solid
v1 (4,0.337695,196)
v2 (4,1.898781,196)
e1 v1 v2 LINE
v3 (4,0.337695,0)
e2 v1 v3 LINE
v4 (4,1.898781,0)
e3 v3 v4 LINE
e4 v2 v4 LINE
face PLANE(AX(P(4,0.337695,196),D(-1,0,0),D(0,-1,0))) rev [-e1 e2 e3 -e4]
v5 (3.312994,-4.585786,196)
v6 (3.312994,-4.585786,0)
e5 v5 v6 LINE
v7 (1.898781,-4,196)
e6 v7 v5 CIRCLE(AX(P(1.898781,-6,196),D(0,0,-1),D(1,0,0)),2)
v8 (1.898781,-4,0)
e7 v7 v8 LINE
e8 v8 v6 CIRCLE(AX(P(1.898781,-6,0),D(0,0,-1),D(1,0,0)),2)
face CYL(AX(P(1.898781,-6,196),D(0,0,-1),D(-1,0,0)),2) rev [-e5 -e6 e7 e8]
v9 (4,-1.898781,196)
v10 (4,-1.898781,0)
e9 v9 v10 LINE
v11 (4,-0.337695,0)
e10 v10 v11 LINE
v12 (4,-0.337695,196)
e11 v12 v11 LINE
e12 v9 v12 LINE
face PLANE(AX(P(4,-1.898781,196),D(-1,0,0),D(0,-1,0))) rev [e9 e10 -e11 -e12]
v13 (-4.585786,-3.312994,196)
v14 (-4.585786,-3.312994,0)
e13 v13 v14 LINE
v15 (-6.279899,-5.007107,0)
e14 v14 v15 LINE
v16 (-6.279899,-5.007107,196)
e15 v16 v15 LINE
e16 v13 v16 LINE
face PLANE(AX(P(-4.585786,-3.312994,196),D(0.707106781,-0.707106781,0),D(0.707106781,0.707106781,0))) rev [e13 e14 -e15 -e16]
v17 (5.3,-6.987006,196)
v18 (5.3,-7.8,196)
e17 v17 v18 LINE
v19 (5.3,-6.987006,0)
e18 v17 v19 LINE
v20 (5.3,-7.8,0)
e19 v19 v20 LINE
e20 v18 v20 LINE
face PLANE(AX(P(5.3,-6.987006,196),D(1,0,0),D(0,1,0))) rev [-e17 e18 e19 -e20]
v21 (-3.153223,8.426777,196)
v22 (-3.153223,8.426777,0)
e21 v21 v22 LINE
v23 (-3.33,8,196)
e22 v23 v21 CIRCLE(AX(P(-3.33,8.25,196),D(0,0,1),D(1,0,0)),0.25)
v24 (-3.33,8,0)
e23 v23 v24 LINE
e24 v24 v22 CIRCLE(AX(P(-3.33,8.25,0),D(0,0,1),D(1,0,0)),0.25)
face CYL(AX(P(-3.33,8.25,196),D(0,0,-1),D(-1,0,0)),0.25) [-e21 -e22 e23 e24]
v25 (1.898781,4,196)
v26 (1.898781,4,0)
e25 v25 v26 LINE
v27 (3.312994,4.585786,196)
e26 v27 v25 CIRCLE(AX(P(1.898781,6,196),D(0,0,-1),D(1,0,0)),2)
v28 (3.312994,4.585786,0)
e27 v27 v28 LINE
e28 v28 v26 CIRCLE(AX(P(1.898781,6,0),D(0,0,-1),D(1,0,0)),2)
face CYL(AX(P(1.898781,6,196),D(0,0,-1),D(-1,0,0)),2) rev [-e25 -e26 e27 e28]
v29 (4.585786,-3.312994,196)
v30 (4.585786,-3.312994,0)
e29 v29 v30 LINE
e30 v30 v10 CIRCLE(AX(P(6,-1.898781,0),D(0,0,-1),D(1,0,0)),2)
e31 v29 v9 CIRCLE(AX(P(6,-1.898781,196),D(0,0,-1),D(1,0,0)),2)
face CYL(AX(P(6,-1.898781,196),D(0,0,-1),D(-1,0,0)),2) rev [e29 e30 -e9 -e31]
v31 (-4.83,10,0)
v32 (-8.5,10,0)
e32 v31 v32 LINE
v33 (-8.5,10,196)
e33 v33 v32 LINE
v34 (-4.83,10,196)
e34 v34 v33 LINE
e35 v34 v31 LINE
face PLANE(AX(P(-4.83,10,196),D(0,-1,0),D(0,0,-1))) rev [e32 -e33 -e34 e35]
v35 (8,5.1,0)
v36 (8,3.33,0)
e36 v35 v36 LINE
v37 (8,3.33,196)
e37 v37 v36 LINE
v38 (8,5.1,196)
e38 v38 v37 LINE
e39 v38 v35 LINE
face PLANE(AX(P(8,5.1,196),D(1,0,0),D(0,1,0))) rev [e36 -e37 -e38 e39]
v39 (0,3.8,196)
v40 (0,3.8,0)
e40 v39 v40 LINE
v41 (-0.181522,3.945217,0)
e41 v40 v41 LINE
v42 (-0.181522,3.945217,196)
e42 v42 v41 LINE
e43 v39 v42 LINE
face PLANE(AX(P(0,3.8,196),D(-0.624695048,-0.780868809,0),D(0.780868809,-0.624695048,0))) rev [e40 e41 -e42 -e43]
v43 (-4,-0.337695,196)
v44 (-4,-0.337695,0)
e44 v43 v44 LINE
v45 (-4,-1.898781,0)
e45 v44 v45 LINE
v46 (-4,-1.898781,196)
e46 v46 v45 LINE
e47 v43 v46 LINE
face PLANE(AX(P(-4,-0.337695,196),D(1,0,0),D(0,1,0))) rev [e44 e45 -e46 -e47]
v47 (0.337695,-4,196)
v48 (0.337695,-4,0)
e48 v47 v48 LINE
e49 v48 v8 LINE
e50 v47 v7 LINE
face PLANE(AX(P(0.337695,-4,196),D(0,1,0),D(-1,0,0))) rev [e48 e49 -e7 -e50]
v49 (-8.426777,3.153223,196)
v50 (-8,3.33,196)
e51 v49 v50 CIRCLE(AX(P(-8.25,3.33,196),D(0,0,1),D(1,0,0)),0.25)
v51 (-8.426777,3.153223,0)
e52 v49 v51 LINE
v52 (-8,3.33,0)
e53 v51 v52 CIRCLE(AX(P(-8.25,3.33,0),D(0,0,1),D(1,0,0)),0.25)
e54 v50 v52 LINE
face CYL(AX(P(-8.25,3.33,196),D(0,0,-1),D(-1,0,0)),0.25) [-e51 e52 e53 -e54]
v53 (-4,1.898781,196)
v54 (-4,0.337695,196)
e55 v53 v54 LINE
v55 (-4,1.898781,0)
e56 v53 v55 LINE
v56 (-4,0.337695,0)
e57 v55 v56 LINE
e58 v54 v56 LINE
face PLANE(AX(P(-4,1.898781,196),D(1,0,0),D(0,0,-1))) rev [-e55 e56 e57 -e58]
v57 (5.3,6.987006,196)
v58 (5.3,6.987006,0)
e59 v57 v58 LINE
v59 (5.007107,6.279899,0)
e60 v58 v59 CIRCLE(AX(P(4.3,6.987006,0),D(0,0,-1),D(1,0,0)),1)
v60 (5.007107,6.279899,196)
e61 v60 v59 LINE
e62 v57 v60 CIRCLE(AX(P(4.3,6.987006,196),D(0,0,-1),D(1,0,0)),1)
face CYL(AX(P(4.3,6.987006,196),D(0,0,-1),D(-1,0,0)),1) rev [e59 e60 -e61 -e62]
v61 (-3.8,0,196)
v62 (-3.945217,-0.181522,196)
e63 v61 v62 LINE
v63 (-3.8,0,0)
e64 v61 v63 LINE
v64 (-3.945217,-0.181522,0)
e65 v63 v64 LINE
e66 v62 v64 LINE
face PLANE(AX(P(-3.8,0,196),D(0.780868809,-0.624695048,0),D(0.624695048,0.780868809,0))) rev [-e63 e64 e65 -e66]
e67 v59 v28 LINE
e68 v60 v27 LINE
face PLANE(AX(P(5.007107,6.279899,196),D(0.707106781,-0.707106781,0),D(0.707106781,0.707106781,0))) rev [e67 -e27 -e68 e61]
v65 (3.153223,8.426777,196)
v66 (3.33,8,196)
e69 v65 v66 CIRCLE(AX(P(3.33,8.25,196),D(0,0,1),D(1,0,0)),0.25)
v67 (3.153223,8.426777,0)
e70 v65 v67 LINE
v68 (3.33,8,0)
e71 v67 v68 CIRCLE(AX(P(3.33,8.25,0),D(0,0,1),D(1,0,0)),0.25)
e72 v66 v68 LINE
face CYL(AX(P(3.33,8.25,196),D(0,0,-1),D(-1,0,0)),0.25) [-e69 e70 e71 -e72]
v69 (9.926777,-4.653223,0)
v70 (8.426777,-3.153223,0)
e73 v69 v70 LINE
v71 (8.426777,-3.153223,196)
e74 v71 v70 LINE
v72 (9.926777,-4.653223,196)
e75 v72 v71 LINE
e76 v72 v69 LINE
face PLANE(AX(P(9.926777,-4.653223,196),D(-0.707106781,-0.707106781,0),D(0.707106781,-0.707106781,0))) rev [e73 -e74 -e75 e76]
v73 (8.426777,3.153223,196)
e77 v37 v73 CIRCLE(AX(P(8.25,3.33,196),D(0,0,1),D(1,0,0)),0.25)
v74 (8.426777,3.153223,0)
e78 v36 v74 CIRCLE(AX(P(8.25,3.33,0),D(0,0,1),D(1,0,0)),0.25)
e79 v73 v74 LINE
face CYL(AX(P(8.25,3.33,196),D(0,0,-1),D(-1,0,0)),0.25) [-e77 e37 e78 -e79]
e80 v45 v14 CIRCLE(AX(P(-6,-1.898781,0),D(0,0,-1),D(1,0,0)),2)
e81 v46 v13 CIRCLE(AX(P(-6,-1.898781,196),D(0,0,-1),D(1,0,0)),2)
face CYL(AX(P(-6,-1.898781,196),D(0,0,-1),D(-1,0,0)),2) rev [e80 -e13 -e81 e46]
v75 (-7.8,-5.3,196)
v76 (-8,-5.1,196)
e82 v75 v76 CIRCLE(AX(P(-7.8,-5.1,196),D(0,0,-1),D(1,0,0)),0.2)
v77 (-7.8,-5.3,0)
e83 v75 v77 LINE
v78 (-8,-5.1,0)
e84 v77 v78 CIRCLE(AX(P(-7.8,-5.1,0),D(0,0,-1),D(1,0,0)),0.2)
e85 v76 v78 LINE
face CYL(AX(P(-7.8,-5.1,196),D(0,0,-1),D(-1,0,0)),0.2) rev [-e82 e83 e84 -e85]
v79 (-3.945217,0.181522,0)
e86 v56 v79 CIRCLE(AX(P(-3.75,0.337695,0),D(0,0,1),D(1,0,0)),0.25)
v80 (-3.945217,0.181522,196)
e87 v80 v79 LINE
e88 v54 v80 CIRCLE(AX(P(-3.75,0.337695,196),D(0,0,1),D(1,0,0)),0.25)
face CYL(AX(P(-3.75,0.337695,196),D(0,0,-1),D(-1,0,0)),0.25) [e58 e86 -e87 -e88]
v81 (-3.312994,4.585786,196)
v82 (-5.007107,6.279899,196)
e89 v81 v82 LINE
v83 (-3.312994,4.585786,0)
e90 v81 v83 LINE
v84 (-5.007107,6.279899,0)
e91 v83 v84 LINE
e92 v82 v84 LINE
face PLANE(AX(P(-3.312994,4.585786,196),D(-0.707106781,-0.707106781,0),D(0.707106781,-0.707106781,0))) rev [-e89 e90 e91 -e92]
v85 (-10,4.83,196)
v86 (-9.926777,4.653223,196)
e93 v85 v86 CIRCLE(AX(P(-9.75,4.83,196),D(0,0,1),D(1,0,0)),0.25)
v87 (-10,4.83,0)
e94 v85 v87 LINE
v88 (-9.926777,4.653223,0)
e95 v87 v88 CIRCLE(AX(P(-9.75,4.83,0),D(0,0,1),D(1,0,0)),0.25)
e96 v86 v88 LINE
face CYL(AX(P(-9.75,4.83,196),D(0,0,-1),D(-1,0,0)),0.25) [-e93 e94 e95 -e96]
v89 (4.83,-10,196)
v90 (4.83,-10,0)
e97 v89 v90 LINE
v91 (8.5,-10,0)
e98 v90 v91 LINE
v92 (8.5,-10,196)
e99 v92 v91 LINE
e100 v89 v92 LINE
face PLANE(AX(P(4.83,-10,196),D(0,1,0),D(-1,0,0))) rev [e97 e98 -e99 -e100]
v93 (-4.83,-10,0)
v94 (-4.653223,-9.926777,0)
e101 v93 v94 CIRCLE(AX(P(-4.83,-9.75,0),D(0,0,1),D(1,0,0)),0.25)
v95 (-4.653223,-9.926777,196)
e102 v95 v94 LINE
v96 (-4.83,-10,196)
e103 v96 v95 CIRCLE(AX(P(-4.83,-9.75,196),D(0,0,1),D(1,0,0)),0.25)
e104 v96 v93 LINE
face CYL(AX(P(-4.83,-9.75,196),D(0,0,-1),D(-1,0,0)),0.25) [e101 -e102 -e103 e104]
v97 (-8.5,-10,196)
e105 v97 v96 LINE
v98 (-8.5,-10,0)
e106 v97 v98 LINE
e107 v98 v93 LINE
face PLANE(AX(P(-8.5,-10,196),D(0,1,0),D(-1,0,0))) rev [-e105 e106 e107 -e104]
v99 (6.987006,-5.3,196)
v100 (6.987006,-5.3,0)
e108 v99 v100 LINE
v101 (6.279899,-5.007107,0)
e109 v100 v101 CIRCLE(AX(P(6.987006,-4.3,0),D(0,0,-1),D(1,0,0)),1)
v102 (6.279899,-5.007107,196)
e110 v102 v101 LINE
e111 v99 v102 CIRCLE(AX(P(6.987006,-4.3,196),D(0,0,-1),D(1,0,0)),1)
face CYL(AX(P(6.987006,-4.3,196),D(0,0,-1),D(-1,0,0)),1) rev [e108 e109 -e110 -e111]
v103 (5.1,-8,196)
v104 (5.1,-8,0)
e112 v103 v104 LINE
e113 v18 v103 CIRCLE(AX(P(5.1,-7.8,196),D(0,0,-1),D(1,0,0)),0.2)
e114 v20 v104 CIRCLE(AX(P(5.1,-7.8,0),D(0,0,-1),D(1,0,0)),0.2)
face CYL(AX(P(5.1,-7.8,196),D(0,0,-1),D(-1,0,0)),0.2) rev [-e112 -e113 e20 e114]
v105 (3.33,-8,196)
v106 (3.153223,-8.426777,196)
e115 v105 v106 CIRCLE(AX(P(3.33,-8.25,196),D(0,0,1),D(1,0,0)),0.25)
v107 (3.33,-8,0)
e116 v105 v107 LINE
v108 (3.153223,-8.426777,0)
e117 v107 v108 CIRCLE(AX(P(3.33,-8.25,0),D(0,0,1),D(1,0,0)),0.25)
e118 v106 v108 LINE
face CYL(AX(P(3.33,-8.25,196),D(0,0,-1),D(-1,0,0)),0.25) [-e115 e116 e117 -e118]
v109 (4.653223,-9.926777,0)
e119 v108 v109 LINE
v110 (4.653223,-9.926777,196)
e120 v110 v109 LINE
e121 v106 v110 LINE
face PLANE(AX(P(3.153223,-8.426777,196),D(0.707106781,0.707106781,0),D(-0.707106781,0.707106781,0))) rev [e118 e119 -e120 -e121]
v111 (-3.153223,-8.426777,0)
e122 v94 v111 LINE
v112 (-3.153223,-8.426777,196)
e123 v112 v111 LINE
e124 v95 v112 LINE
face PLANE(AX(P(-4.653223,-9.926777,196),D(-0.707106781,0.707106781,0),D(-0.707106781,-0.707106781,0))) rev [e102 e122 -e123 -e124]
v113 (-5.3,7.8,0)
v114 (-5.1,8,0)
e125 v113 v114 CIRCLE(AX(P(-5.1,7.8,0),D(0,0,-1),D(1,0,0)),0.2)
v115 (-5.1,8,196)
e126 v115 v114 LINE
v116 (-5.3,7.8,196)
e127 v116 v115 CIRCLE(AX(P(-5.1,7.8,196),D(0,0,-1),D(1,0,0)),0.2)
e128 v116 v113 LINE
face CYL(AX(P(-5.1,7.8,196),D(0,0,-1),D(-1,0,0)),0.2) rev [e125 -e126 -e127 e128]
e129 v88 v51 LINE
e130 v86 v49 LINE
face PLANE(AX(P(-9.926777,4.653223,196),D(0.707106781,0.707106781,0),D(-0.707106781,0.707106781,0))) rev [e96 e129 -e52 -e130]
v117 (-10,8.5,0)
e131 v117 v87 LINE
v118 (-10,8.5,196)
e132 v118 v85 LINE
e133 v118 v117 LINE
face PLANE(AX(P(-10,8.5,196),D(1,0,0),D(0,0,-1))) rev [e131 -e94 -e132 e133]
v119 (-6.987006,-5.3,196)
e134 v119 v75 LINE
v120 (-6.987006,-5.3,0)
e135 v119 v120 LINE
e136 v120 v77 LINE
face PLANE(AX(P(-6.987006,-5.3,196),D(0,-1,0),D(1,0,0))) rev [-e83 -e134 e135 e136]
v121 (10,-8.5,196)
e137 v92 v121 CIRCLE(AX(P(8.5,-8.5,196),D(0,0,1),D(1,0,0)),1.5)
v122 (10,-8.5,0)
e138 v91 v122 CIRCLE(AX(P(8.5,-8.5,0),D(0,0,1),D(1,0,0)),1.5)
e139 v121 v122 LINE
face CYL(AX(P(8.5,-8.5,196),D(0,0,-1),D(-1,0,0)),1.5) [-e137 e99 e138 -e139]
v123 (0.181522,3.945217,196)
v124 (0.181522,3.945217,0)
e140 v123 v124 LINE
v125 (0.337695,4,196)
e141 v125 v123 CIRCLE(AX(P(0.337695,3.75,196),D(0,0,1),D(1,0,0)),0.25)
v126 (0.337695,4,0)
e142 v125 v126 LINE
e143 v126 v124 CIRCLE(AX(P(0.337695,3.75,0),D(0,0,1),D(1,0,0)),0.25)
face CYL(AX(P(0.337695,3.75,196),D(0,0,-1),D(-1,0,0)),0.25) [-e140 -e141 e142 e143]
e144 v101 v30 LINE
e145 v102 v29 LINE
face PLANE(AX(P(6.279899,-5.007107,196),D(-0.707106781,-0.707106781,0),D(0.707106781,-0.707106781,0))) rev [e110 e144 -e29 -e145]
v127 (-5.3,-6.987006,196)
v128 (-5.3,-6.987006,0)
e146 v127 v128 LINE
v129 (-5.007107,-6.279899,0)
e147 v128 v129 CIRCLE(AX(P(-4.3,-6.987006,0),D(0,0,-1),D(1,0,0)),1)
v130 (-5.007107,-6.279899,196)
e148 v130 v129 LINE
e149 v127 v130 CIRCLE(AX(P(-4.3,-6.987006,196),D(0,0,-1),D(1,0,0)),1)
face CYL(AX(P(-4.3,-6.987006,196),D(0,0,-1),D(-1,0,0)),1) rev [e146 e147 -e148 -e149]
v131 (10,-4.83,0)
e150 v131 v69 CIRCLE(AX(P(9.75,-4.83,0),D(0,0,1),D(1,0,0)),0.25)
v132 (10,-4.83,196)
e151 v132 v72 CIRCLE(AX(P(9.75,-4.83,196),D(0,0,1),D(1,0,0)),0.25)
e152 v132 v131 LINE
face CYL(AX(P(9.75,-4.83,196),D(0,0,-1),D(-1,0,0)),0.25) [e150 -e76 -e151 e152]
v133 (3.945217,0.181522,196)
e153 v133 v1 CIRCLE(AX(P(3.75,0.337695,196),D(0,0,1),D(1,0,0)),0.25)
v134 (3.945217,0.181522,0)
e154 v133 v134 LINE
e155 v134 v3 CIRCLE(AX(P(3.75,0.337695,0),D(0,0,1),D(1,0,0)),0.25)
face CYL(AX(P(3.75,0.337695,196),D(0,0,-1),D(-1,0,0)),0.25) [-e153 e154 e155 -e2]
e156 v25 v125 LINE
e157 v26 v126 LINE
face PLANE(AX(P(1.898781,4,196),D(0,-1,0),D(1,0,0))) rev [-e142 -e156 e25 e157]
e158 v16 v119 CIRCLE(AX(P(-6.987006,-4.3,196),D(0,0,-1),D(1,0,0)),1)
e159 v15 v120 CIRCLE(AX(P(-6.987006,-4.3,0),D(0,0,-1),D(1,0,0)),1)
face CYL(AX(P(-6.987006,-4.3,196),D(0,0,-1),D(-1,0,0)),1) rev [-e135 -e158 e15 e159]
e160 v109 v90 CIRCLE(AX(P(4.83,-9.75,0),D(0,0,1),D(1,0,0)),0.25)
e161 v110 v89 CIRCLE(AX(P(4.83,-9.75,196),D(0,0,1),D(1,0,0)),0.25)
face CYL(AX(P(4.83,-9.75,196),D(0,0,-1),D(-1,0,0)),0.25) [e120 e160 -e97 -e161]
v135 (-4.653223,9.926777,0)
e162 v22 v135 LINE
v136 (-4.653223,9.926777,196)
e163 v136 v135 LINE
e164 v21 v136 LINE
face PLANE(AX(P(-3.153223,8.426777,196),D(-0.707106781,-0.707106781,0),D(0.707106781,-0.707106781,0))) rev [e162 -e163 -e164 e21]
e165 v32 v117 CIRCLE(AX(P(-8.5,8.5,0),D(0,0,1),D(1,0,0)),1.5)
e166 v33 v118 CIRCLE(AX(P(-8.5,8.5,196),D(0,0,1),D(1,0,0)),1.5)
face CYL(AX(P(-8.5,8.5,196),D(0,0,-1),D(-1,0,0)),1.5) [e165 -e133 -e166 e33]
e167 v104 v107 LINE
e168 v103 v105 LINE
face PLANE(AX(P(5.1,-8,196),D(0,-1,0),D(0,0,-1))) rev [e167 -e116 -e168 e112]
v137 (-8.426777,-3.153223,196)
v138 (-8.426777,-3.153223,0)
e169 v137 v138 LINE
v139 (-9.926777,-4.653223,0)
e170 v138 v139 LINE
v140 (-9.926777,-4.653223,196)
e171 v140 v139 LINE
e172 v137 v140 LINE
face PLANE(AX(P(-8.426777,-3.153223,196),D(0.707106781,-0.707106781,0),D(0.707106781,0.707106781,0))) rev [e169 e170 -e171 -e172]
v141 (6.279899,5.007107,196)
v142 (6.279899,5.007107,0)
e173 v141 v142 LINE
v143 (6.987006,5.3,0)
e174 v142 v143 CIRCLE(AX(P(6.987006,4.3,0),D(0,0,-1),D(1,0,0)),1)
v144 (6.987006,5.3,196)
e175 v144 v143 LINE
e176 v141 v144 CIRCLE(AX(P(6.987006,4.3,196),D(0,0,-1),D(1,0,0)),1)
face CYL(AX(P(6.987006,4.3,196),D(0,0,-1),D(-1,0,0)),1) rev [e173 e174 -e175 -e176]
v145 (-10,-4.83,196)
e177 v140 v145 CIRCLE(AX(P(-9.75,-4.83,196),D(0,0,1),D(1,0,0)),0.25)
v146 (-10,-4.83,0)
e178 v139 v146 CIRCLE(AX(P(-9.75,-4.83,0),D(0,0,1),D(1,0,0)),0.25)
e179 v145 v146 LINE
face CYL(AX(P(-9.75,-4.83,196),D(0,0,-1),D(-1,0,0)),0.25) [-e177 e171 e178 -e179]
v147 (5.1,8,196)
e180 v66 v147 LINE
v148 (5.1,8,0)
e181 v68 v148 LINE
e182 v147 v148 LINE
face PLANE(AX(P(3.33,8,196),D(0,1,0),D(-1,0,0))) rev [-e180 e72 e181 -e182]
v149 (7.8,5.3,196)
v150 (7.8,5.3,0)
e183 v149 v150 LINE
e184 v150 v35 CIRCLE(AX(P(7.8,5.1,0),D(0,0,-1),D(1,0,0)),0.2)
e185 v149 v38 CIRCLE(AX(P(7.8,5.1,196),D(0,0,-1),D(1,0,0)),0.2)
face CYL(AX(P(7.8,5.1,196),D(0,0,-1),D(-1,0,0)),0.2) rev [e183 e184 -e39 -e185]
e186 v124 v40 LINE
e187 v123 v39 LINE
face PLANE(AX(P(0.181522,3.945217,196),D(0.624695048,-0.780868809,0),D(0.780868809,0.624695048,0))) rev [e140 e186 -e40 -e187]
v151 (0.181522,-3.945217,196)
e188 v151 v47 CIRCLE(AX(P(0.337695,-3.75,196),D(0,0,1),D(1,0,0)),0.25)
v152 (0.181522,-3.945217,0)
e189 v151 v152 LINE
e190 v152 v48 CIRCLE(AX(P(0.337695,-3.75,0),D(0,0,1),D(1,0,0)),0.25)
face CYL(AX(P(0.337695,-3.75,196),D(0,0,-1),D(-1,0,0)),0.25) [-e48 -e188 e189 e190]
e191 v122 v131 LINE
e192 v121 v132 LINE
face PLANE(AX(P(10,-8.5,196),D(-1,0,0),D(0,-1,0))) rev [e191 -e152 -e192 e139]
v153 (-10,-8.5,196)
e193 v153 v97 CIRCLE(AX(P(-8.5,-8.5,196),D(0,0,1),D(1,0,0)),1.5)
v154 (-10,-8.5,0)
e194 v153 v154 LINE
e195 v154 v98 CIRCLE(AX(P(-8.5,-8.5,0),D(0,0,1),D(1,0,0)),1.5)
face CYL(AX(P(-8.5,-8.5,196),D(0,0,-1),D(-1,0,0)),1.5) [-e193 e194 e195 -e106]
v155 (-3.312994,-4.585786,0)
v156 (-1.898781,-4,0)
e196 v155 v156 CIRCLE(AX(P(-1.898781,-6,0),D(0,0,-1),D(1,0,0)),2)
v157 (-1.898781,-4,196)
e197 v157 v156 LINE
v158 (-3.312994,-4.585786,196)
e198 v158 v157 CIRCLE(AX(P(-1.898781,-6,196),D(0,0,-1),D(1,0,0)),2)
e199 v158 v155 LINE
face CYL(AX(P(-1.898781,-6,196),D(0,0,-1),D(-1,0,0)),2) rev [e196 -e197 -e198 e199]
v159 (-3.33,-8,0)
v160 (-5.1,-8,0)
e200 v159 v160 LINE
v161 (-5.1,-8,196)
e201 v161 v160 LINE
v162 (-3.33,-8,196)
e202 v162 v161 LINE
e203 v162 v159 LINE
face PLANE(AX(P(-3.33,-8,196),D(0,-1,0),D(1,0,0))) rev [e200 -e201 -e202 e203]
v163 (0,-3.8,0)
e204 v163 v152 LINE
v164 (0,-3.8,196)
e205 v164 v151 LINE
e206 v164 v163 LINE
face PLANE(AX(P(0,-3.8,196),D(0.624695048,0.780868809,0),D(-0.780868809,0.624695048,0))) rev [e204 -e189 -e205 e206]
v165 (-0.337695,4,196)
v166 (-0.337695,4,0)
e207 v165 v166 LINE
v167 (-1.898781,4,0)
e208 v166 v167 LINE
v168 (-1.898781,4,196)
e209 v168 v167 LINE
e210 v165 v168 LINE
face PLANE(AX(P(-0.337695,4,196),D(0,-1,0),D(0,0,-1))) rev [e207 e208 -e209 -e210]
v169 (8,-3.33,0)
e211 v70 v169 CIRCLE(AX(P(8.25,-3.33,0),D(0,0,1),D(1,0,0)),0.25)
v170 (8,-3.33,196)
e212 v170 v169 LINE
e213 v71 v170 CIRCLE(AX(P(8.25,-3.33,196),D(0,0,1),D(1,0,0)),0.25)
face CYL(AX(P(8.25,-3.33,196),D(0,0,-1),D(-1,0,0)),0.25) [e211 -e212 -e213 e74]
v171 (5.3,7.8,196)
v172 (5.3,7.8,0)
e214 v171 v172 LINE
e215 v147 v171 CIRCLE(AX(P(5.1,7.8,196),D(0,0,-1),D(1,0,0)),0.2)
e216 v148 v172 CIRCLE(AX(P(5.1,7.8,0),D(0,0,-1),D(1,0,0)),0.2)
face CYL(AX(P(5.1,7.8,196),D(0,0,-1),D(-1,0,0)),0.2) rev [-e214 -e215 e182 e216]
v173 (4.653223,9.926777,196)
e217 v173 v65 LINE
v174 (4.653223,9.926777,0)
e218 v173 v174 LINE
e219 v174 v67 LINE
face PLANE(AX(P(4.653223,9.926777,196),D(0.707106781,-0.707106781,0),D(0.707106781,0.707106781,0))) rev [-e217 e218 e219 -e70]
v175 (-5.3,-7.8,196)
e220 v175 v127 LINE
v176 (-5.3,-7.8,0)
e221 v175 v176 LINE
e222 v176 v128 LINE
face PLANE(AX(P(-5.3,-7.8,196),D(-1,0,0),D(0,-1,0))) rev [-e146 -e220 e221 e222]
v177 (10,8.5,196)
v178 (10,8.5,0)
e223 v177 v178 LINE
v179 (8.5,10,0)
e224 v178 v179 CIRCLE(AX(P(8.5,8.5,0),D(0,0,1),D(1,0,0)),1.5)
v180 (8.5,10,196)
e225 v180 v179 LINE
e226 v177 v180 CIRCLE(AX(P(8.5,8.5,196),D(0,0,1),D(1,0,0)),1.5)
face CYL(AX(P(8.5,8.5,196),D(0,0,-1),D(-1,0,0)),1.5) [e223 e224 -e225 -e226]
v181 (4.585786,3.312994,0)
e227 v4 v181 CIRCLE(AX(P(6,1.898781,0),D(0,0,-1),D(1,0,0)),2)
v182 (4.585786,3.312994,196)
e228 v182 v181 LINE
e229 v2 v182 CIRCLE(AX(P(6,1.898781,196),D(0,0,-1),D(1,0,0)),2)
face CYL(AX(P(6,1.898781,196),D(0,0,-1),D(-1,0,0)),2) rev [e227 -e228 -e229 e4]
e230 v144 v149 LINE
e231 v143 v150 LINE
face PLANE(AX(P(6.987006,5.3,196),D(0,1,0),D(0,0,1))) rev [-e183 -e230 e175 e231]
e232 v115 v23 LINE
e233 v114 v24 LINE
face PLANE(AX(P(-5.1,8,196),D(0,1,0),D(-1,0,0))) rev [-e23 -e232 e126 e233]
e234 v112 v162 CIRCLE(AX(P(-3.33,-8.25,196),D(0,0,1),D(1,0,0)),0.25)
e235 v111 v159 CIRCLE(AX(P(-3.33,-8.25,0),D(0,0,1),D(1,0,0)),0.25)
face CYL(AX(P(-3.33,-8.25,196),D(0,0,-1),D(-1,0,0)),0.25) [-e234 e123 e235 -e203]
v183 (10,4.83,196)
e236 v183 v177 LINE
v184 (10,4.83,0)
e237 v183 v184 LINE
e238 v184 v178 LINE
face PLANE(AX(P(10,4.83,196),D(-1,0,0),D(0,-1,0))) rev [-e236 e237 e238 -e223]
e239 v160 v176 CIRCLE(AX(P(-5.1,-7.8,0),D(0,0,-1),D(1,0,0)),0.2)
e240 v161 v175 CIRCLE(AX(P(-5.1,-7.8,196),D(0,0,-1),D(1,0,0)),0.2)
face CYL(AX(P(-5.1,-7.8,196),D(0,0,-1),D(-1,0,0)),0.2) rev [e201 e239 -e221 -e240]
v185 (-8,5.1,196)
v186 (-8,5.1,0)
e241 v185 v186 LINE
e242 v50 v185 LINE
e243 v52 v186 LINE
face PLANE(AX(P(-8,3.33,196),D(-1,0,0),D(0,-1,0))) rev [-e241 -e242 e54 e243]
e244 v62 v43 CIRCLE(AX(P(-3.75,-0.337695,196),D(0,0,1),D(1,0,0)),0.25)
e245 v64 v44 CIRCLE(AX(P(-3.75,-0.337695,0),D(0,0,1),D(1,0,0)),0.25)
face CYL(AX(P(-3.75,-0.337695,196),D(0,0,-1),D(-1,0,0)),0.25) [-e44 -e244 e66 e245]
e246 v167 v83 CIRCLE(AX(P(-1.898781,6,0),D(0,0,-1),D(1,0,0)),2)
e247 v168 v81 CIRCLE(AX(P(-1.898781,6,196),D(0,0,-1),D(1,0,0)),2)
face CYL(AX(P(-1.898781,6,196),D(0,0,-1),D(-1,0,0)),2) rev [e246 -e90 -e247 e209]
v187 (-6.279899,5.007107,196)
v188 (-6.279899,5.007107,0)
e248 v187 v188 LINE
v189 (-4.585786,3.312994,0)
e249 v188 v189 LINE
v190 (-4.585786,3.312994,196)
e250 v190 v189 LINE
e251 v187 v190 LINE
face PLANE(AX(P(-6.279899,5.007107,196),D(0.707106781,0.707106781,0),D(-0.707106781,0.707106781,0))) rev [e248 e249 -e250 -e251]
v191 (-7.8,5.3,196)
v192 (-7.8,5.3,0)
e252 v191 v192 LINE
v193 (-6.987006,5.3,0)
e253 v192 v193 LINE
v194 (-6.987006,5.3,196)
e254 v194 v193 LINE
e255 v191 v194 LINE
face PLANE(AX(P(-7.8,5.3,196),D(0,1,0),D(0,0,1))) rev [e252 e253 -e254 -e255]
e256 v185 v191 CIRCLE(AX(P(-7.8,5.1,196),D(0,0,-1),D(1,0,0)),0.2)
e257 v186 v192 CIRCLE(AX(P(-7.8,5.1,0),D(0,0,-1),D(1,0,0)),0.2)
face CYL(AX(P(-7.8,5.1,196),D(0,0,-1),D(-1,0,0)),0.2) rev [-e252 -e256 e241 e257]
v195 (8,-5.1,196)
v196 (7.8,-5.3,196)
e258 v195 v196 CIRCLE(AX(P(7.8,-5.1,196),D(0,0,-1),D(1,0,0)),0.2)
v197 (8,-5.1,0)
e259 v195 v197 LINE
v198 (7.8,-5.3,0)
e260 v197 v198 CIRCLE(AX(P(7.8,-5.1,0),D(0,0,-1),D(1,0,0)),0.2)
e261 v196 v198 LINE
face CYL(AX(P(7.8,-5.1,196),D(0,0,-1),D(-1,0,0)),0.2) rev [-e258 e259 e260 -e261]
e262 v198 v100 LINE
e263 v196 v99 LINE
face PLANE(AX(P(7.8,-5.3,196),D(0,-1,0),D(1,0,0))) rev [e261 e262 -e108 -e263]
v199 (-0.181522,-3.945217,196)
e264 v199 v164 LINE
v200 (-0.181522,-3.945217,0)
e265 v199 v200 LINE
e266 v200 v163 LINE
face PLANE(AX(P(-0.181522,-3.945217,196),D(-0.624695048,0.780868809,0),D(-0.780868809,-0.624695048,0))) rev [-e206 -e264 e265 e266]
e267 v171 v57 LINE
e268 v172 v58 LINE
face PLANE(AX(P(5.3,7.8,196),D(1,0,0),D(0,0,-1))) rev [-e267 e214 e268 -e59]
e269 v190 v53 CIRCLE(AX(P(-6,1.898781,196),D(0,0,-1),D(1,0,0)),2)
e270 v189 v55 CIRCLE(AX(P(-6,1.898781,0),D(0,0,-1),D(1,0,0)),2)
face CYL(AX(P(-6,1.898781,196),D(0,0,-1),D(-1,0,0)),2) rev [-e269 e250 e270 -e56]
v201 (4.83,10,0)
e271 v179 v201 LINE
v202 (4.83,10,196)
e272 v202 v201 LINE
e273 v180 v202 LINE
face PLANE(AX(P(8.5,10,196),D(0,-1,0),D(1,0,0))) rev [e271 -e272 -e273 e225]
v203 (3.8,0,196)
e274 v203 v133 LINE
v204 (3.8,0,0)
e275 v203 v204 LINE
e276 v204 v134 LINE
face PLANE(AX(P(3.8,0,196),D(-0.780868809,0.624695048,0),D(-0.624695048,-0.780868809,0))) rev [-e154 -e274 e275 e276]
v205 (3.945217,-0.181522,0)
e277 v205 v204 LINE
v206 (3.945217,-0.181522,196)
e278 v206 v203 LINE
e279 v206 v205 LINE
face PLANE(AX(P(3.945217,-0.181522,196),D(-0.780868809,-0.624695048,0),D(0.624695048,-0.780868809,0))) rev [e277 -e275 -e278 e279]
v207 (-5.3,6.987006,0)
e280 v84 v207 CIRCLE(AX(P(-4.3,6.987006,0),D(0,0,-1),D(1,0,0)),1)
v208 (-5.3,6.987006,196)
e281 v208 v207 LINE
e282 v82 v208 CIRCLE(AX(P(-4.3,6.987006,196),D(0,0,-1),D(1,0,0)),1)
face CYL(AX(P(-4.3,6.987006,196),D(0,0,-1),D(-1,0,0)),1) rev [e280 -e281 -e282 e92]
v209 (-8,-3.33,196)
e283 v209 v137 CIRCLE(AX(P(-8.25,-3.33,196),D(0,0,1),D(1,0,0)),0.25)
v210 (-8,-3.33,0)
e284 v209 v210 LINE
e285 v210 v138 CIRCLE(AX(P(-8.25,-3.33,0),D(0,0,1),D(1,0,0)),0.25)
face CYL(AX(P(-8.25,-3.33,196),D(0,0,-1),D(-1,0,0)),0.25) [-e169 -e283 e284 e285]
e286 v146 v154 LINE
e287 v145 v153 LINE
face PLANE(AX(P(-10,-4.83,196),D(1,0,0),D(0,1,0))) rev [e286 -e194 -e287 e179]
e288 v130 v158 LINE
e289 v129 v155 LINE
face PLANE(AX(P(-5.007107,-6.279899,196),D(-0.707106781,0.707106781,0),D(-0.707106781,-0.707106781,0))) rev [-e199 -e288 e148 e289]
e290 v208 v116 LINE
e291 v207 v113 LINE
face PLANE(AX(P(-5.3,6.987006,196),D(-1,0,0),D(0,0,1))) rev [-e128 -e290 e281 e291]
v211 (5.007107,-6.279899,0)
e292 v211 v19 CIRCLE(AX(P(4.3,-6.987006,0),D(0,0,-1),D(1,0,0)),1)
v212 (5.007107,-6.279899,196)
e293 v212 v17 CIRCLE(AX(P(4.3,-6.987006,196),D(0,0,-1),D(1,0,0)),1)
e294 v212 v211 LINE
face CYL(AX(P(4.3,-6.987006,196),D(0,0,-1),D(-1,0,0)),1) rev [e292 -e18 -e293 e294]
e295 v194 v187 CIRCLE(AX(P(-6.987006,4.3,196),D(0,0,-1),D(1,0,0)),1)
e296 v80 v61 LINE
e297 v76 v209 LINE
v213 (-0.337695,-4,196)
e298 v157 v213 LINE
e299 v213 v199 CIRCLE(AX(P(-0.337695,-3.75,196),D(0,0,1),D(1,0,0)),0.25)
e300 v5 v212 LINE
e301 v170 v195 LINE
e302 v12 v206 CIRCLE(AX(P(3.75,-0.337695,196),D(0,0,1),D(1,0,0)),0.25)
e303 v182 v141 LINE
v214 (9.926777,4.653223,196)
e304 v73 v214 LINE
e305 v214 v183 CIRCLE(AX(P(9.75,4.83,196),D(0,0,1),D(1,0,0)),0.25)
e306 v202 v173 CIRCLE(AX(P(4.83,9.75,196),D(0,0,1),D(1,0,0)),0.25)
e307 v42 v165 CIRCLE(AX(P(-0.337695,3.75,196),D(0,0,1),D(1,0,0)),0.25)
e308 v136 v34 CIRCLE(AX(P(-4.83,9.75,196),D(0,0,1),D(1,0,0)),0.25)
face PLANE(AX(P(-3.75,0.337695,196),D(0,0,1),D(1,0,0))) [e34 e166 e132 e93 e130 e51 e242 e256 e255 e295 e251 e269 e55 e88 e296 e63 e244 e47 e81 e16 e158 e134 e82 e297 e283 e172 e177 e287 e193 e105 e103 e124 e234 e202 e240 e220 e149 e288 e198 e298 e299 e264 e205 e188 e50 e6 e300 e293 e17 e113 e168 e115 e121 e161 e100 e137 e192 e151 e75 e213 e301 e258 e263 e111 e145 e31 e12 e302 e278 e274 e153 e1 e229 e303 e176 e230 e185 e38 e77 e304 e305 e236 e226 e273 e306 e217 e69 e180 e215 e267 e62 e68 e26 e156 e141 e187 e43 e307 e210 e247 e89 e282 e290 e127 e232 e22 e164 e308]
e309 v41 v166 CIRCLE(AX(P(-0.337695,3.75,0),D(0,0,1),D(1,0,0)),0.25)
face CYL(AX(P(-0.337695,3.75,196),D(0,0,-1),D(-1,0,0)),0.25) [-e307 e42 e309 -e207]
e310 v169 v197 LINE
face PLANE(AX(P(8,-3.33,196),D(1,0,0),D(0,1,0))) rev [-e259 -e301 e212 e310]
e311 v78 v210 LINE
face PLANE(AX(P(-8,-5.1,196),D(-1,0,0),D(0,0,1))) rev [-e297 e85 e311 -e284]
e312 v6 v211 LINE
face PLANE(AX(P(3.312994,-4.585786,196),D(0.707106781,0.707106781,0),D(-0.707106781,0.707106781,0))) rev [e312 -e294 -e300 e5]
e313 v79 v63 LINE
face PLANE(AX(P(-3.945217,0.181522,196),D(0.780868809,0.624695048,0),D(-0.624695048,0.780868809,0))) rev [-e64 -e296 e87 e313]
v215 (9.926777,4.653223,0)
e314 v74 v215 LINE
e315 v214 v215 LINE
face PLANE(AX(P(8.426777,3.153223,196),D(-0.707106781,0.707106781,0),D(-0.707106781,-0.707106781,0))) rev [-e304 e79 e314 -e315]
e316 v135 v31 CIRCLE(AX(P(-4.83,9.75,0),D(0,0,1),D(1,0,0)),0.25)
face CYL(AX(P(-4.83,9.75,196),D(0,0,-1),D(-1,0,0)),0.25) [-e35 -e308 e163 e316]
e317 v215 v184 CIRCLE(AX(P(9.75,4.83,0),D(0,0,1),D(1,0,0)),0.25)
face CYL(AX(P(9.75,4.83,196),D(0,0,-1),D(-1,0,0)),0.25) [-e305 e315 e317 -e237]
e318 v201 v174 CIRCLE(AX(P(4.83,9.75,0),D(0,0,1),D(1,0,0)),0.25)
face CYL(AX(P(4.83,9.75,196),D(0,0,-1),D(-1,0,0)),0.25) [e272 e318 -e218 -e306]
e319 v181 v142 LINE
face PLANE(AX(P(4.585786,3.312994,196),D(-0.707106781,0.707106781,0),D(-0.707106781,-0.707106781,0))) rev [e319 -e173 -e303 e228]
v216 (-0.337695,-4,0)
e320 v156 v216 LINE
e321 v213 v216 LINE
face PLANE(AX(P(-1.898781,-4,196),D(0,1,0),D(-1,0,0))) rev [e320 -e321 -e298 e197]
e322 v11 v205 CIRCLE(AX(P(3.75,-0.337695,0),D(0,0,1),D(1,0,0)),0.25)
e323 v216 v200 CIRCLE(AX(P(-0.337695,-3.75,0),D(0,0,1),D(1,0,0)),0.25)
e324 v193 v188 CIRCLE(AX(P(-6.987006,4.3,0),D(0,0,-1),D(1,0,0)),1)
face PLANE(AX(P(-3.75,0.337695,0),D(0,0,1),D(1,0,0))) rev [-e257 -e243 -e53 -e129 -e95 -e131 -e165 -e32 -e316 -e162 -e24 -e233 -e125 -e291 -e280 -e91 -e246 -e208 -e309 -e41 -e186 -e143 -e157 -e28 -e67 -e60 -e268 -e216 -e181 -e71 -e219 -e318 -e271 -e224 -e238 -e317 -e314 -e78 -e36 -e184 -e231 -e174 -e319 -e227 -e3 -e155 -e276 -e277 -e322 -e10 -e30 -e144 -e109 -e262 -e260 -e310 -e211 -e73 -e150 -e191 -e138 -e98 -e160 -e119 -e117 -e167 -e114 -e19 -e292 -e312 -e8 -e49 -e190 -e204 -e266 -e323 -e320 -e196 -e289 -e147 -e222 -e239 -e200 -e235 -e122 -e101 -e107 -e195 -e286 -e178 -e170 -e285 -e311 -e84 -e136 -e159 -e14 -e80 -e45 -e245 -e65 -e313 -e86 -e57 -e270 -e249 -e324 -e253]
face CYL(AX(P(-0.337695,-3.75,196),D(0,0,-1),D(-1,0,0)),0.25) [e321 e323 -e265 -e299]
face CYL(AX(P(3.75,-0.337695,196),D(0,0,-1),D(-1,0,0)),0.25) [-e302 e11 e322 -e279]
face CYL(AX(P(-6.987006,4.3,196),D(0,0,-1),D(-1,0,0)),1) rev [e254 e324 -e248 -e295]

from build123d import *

# Parameters (mm, degrees)
EXTRUDE_1_DEPTH = 196


# Read off the part's stored shape, not the designer's step: 222 Конструкционный профиль 20х20-1-surface1
with BuildPart() as part:
    # Эскиз1 → Бобышка-Вытянуть1 (new body)
    with BuildSketch(Plane.XY):
        with BuildLine():
            Line((-3.945217202, 0.181521503), (-3.8, 0))
            Line((-3.8, 0), (-3.945217202, -0.181521503))
            ThreePointArc((-3.945217202, -0.181521503), (-3.98590708, -0.254943529), (-4, -0.337695265))
            Line((-4, -0.337695265), (-4, -1.898780669))
            ThreePointArc((-4, -1.898780669), (-4.152240935, -2.664147534), (-4.585786438, -3.312994231))
            Line((-4.585786438, -3.312994231), (-6.279898987, -5.007106781))
            ThreePointArc((-6.279898987, -5.007106781), (-6.604322336, -5.223879533), (-6.987005769, -5.3))
            Line((-6.987005769, -5.3), (-7.8, -5.3))
            ThreePointArc((-7.8, -5.3), (-7.941421356, -5.241421356), (-8, -5.1))
            Line((-8, -5.1), (-8, -3.33))
            ThreePointArc((-8, -3.33), (-8.154329142, -3.099030117), (-8.426776695, -3.153223305))
            Line((-8.426776695, -3.153223305), (-9.926776695, -4.653223305))
            ThreePointArc((-9.926776695, -4.653223305), (-9.980969883, -4.734329142), (-10, -4.83))
            Line((-10, -4.83), (-10, -8.5))
            ThreePointArc((-10, -8.5), (-9.560660172, -9.560660172), (-8.5, -10))
            Line((-8.5, -10), (-4.83, -10))
            ThreePointArc((-4.83, -10), (-4.734329142, -9.980969883), (-4.653223305, -9.926776695))
            Line((-4.653223305, -9.926776695), (-3.153223305, -8.426776695))
            ThreePointArc((-3.153223305, -8.426776695), (-3.099030117, -8.154329142), (-3.33, -8))
            Line((-3.33, -8), (-5.1, -8))
            ThreePointArc((-5.1, -8), (-5.241421356, -7.941421356), (-5.3, -7.8))
            Line((-5.3, -7.8), (-5.3, -6.987005769))
            ThreePointArc((-5.3, -6.987005769), (-5.223879533, -6.604322336), (-5.007106781, -6.279898987))
            Line((-5.007106781, -6.279898987), (-3.312994231, -4.585786438))
            ThreePointArc((-3.312994231, -4.585786438), (-2.664147534, -4.152240935), (-1.898780669, -4))
            Line((-1.898780669, -4), (-0.337695265, -4))
            ThreePointArc((-0.337695265, -4), (-0.254943529, -3.98590708), (-0.181521503, -3.945217202))
            Line((-0.181521503, -3.945217202), (0, -3.8))
            Line((0, -3.8), (0.181521503, -3.945217202))
            ThreePointArc((0.181521503, -3.945217202), (0.254943529, -3.98590708), (0.337695265, -4))
            Line((0.337695265, -4), (1.898780669, -4))
            ThreePointArc((1.898780669, -4), (2.664147534, -4.152240935), (3.312994231, -4.585786438))
            Line((3.312994231, -4.585786438), (5.007106781, -6.279898987))
            ThreePointArc((5.007106781, -6.279898987), (5.223879533, -6.604322336), (5.3, -6.987005769))
            Line((5.3, -6.987005769), (5.3, -7.8))
            ThreePointArc((5.3, -7.8), (5.241421356, -7.941421356), (5.1, -8))
            Line((5.1, -8), (3.33, -8))
            ThreePointArc((3.33, -8), (3.099030117, -8.154329142), (3.153223305, -8.426776695))
            Line((3.153223305, -8.426776695), (4.653223305, -9.926776695))
            ThreePointArc((4.653223305, -9.926776695), (4.734329142, -9.980969883), (4.83, -10))
            Line((4.83, -10), (8.5, -10))
            ThreePointArc((8.5, -10), (9.560660172, -9.560660172), (10, -8.5))
            Line((10, -8.5), (10, -4.83))
            ThreePointArc((10, -4.83), (9.980969883, -4.734329142), (9.926776695, -4.653223305))
            Line((9.926776695, -4.653223305), (8.426776695, -3.153223305))
            ThreePointArc((8.426776695, -3.153223305), (8.154329142, -3.099030117), (8, -3.33))
            Line((8, -3.33), (8, -5.1))
            ThreePointArc((8, -5.1), (7.941421356, -5.241421356), (7.8, -5.3))
            Line((7.8, -5.3), (6.987005769, -5.3))
            ThreePointArc((6.987005769, -5.3), (6.604322336, -5.223879533), (6.279898987, -5.007106781))
            Line((6.279898987, -5.007106781), (4.585786438, -3.312994231))
            ThreePointArc((4.585786438, -3.312994231), (4.152240935, -2.664147534), (4, -1.898780669))
            Line((4, -1.898780669), (4, -0.337695265))
            ThreePointArc((4, -0.337695265), (3.98590708, -0.254943529), (3.945217202, -0.181521503))
            Line((3.945217202, -0.181521503), (3.8, 0))
            Line((3.8, 0), (3.945217202, 0.181521503))
            ThreePointArc((3.945217202, 0.181521503), (3.98590708, 0.254943529), (4, 0.337695265))
            Line((4, 0.337695265), (4, 1.898780669))
            ThreePointArc((4, 1.898780669), (4.152240935, 2.664147534), (4.585786438, 3.312994231))
            Line((4.585786438, 3.312994231), (6.279898987, 5.007106781))
            ThreePointArc((6.279898987, 5.007106781), (6.604322336, 5.223879533), (6.987005769, 5.3))
            Line((6.987005769, 5.3), (7.8, 5.3))
            ThreePointArc((7.8, 5.3), (7.941421356, 5.241421356), (8, 5.1))
            Line((8, 5.1), (8, 3.33))
            ThreePointArc((8, 3.33), (8.154329142, 3.099030117), (8.426776695, 3.153223305))
            Line((8.426776695, 3.153223305), (9.926776695, 4.653223305))
            ThreePointArc((9.926776695, 4.653223305), (9.980969883, 4.734329142), (10, 4.83))
            Line((10, 4.83), (10, 8.5))
            ThreePointArc((10, 8.5), (9.560660172, 9.560660172), (8.5, 10))
            Line((8.5, 10), (4.83, 10))
            ThreePointArc((4.83, 10), (4.734329142, 9.980969883), (4.653223305, 9.926776695))
            Line((4.653223305, 9.926776695), (3.153223305, 8.426776695))
            ThreePointArc((3.153223305, 8.426776695), (3.099030117, 8.154329142), (3.33, 8))
            Line((3.33, 8), (5.1, 8))
            ThreePointArc((5.1, 8), (5.241421356, 7.941421356), (5.3, 7.8))
            Line((5.3, 7.8), (5.3, 6.987005769))
            ThreePointArc((5.3, 6.987005769), (5.223879533, 6.604322336), (5.007106781, 6.279898987))
            Line((5.007106781, 6.279898987), (3.312994231, 4.585786438))
            ThreePointArc((3.312994231, 4.585786438), (2.664147534, 4.152240935), (1.898780669, 4))
            Line((1.898780669, 4), (0.337695265, 4))
            ThreePointArc((0.337695265, 4), (0.254943529, 3.98590708), (0.181521503, 3.945217202))
            Line((0.181521503, 3.945217202), (0, 3.8))
            Line((0, 3.8), (-0.181521503, 3.945217202))
            ThreePointArc((-0.181521503, 3.945217202), (-0.254943529, 3.98590708), (-0.337695265, 4))
            Line((-0.337695265, 4), (-1.898780669, 4))
            ThreePointArc((-1.898780669, 4), (-2.664147534, 4.152240935), (-3.312994231, 4.585786438))
            Line((-3.312994231, 4.585786438), (-5.007106781, 6.279898987))
            ThreePointArc((-5.007106781, 6.279898987), (-5.223879533, 6.604322336), (-5.3, 6.987005769))
            Line((-5.3, 6.987005769), (-5.3, 7.8))
            ThreePointArc((-5.3, 7.8), (-5.241421356, 7.941421356), (-5.1, 8))
            Line((-5.1, 8), (-3.33, 8))
            ThreePointArc((-3.33, 8), (-3.099030117, 8.154329142), (-3.153223305, 8.426776695))
            Line((-3.153223305, 8.426776695), (-4.653223305, 9.926776695))
            ThreePointArc((-4.653223305, 9.926776695), (-4.734329142, 9.980969883), (-4.83, 10))
            Line((-4.83, 10), (-8.5, 10))
            ThreePointArc((-8.5, 10), (-9.560660172, 9.560660172), (-10, 8.5))
            Line((-10, 8.5), (-10, 4.83))
            ThreePointArc((-10, 4.83), (-9.980969883, 4.734329142), (-9.926776695, 4.653223305))
            Line((-9.926776695, 4.653223305), (-8.426776695, 3.153223305))
            ThreePointArc((-8.426776695, 3.153223305), (-8.154329142, 3.099030117), (-8, 3.33))
            Line((-8, 3.33), (-8, 5.1))
            ThreePointArc((-8, 5.1), (-7.941421356, 5.241421356), (-7.8, 5.3))
            Line((-7.8, 5.3), (-6.987005769, 5.3))
            ThreePointArc((-6.987005769, 5.3), (-6.604322336, 5.223879533), (-6.279898987, 5.007106781))
            Line((-6.279898987, 5.007106781), (-4.585786438, 3.312994231))
            ThreePointArc((-4.585786438, 3.312994231), (-4.152240935, 2.664147534), (-4, 1.898780669))
            Line((-4, 1.898780669), (-4, 0.337695265))
            ThreePointArc((-4, 0.337695265), (-3.98590708, 0.254943529), (-3.945217202, 0.181521503))
        make_face()
    extrude(amount=EXTRUDE_1_DEPTH)


solid = part.part
